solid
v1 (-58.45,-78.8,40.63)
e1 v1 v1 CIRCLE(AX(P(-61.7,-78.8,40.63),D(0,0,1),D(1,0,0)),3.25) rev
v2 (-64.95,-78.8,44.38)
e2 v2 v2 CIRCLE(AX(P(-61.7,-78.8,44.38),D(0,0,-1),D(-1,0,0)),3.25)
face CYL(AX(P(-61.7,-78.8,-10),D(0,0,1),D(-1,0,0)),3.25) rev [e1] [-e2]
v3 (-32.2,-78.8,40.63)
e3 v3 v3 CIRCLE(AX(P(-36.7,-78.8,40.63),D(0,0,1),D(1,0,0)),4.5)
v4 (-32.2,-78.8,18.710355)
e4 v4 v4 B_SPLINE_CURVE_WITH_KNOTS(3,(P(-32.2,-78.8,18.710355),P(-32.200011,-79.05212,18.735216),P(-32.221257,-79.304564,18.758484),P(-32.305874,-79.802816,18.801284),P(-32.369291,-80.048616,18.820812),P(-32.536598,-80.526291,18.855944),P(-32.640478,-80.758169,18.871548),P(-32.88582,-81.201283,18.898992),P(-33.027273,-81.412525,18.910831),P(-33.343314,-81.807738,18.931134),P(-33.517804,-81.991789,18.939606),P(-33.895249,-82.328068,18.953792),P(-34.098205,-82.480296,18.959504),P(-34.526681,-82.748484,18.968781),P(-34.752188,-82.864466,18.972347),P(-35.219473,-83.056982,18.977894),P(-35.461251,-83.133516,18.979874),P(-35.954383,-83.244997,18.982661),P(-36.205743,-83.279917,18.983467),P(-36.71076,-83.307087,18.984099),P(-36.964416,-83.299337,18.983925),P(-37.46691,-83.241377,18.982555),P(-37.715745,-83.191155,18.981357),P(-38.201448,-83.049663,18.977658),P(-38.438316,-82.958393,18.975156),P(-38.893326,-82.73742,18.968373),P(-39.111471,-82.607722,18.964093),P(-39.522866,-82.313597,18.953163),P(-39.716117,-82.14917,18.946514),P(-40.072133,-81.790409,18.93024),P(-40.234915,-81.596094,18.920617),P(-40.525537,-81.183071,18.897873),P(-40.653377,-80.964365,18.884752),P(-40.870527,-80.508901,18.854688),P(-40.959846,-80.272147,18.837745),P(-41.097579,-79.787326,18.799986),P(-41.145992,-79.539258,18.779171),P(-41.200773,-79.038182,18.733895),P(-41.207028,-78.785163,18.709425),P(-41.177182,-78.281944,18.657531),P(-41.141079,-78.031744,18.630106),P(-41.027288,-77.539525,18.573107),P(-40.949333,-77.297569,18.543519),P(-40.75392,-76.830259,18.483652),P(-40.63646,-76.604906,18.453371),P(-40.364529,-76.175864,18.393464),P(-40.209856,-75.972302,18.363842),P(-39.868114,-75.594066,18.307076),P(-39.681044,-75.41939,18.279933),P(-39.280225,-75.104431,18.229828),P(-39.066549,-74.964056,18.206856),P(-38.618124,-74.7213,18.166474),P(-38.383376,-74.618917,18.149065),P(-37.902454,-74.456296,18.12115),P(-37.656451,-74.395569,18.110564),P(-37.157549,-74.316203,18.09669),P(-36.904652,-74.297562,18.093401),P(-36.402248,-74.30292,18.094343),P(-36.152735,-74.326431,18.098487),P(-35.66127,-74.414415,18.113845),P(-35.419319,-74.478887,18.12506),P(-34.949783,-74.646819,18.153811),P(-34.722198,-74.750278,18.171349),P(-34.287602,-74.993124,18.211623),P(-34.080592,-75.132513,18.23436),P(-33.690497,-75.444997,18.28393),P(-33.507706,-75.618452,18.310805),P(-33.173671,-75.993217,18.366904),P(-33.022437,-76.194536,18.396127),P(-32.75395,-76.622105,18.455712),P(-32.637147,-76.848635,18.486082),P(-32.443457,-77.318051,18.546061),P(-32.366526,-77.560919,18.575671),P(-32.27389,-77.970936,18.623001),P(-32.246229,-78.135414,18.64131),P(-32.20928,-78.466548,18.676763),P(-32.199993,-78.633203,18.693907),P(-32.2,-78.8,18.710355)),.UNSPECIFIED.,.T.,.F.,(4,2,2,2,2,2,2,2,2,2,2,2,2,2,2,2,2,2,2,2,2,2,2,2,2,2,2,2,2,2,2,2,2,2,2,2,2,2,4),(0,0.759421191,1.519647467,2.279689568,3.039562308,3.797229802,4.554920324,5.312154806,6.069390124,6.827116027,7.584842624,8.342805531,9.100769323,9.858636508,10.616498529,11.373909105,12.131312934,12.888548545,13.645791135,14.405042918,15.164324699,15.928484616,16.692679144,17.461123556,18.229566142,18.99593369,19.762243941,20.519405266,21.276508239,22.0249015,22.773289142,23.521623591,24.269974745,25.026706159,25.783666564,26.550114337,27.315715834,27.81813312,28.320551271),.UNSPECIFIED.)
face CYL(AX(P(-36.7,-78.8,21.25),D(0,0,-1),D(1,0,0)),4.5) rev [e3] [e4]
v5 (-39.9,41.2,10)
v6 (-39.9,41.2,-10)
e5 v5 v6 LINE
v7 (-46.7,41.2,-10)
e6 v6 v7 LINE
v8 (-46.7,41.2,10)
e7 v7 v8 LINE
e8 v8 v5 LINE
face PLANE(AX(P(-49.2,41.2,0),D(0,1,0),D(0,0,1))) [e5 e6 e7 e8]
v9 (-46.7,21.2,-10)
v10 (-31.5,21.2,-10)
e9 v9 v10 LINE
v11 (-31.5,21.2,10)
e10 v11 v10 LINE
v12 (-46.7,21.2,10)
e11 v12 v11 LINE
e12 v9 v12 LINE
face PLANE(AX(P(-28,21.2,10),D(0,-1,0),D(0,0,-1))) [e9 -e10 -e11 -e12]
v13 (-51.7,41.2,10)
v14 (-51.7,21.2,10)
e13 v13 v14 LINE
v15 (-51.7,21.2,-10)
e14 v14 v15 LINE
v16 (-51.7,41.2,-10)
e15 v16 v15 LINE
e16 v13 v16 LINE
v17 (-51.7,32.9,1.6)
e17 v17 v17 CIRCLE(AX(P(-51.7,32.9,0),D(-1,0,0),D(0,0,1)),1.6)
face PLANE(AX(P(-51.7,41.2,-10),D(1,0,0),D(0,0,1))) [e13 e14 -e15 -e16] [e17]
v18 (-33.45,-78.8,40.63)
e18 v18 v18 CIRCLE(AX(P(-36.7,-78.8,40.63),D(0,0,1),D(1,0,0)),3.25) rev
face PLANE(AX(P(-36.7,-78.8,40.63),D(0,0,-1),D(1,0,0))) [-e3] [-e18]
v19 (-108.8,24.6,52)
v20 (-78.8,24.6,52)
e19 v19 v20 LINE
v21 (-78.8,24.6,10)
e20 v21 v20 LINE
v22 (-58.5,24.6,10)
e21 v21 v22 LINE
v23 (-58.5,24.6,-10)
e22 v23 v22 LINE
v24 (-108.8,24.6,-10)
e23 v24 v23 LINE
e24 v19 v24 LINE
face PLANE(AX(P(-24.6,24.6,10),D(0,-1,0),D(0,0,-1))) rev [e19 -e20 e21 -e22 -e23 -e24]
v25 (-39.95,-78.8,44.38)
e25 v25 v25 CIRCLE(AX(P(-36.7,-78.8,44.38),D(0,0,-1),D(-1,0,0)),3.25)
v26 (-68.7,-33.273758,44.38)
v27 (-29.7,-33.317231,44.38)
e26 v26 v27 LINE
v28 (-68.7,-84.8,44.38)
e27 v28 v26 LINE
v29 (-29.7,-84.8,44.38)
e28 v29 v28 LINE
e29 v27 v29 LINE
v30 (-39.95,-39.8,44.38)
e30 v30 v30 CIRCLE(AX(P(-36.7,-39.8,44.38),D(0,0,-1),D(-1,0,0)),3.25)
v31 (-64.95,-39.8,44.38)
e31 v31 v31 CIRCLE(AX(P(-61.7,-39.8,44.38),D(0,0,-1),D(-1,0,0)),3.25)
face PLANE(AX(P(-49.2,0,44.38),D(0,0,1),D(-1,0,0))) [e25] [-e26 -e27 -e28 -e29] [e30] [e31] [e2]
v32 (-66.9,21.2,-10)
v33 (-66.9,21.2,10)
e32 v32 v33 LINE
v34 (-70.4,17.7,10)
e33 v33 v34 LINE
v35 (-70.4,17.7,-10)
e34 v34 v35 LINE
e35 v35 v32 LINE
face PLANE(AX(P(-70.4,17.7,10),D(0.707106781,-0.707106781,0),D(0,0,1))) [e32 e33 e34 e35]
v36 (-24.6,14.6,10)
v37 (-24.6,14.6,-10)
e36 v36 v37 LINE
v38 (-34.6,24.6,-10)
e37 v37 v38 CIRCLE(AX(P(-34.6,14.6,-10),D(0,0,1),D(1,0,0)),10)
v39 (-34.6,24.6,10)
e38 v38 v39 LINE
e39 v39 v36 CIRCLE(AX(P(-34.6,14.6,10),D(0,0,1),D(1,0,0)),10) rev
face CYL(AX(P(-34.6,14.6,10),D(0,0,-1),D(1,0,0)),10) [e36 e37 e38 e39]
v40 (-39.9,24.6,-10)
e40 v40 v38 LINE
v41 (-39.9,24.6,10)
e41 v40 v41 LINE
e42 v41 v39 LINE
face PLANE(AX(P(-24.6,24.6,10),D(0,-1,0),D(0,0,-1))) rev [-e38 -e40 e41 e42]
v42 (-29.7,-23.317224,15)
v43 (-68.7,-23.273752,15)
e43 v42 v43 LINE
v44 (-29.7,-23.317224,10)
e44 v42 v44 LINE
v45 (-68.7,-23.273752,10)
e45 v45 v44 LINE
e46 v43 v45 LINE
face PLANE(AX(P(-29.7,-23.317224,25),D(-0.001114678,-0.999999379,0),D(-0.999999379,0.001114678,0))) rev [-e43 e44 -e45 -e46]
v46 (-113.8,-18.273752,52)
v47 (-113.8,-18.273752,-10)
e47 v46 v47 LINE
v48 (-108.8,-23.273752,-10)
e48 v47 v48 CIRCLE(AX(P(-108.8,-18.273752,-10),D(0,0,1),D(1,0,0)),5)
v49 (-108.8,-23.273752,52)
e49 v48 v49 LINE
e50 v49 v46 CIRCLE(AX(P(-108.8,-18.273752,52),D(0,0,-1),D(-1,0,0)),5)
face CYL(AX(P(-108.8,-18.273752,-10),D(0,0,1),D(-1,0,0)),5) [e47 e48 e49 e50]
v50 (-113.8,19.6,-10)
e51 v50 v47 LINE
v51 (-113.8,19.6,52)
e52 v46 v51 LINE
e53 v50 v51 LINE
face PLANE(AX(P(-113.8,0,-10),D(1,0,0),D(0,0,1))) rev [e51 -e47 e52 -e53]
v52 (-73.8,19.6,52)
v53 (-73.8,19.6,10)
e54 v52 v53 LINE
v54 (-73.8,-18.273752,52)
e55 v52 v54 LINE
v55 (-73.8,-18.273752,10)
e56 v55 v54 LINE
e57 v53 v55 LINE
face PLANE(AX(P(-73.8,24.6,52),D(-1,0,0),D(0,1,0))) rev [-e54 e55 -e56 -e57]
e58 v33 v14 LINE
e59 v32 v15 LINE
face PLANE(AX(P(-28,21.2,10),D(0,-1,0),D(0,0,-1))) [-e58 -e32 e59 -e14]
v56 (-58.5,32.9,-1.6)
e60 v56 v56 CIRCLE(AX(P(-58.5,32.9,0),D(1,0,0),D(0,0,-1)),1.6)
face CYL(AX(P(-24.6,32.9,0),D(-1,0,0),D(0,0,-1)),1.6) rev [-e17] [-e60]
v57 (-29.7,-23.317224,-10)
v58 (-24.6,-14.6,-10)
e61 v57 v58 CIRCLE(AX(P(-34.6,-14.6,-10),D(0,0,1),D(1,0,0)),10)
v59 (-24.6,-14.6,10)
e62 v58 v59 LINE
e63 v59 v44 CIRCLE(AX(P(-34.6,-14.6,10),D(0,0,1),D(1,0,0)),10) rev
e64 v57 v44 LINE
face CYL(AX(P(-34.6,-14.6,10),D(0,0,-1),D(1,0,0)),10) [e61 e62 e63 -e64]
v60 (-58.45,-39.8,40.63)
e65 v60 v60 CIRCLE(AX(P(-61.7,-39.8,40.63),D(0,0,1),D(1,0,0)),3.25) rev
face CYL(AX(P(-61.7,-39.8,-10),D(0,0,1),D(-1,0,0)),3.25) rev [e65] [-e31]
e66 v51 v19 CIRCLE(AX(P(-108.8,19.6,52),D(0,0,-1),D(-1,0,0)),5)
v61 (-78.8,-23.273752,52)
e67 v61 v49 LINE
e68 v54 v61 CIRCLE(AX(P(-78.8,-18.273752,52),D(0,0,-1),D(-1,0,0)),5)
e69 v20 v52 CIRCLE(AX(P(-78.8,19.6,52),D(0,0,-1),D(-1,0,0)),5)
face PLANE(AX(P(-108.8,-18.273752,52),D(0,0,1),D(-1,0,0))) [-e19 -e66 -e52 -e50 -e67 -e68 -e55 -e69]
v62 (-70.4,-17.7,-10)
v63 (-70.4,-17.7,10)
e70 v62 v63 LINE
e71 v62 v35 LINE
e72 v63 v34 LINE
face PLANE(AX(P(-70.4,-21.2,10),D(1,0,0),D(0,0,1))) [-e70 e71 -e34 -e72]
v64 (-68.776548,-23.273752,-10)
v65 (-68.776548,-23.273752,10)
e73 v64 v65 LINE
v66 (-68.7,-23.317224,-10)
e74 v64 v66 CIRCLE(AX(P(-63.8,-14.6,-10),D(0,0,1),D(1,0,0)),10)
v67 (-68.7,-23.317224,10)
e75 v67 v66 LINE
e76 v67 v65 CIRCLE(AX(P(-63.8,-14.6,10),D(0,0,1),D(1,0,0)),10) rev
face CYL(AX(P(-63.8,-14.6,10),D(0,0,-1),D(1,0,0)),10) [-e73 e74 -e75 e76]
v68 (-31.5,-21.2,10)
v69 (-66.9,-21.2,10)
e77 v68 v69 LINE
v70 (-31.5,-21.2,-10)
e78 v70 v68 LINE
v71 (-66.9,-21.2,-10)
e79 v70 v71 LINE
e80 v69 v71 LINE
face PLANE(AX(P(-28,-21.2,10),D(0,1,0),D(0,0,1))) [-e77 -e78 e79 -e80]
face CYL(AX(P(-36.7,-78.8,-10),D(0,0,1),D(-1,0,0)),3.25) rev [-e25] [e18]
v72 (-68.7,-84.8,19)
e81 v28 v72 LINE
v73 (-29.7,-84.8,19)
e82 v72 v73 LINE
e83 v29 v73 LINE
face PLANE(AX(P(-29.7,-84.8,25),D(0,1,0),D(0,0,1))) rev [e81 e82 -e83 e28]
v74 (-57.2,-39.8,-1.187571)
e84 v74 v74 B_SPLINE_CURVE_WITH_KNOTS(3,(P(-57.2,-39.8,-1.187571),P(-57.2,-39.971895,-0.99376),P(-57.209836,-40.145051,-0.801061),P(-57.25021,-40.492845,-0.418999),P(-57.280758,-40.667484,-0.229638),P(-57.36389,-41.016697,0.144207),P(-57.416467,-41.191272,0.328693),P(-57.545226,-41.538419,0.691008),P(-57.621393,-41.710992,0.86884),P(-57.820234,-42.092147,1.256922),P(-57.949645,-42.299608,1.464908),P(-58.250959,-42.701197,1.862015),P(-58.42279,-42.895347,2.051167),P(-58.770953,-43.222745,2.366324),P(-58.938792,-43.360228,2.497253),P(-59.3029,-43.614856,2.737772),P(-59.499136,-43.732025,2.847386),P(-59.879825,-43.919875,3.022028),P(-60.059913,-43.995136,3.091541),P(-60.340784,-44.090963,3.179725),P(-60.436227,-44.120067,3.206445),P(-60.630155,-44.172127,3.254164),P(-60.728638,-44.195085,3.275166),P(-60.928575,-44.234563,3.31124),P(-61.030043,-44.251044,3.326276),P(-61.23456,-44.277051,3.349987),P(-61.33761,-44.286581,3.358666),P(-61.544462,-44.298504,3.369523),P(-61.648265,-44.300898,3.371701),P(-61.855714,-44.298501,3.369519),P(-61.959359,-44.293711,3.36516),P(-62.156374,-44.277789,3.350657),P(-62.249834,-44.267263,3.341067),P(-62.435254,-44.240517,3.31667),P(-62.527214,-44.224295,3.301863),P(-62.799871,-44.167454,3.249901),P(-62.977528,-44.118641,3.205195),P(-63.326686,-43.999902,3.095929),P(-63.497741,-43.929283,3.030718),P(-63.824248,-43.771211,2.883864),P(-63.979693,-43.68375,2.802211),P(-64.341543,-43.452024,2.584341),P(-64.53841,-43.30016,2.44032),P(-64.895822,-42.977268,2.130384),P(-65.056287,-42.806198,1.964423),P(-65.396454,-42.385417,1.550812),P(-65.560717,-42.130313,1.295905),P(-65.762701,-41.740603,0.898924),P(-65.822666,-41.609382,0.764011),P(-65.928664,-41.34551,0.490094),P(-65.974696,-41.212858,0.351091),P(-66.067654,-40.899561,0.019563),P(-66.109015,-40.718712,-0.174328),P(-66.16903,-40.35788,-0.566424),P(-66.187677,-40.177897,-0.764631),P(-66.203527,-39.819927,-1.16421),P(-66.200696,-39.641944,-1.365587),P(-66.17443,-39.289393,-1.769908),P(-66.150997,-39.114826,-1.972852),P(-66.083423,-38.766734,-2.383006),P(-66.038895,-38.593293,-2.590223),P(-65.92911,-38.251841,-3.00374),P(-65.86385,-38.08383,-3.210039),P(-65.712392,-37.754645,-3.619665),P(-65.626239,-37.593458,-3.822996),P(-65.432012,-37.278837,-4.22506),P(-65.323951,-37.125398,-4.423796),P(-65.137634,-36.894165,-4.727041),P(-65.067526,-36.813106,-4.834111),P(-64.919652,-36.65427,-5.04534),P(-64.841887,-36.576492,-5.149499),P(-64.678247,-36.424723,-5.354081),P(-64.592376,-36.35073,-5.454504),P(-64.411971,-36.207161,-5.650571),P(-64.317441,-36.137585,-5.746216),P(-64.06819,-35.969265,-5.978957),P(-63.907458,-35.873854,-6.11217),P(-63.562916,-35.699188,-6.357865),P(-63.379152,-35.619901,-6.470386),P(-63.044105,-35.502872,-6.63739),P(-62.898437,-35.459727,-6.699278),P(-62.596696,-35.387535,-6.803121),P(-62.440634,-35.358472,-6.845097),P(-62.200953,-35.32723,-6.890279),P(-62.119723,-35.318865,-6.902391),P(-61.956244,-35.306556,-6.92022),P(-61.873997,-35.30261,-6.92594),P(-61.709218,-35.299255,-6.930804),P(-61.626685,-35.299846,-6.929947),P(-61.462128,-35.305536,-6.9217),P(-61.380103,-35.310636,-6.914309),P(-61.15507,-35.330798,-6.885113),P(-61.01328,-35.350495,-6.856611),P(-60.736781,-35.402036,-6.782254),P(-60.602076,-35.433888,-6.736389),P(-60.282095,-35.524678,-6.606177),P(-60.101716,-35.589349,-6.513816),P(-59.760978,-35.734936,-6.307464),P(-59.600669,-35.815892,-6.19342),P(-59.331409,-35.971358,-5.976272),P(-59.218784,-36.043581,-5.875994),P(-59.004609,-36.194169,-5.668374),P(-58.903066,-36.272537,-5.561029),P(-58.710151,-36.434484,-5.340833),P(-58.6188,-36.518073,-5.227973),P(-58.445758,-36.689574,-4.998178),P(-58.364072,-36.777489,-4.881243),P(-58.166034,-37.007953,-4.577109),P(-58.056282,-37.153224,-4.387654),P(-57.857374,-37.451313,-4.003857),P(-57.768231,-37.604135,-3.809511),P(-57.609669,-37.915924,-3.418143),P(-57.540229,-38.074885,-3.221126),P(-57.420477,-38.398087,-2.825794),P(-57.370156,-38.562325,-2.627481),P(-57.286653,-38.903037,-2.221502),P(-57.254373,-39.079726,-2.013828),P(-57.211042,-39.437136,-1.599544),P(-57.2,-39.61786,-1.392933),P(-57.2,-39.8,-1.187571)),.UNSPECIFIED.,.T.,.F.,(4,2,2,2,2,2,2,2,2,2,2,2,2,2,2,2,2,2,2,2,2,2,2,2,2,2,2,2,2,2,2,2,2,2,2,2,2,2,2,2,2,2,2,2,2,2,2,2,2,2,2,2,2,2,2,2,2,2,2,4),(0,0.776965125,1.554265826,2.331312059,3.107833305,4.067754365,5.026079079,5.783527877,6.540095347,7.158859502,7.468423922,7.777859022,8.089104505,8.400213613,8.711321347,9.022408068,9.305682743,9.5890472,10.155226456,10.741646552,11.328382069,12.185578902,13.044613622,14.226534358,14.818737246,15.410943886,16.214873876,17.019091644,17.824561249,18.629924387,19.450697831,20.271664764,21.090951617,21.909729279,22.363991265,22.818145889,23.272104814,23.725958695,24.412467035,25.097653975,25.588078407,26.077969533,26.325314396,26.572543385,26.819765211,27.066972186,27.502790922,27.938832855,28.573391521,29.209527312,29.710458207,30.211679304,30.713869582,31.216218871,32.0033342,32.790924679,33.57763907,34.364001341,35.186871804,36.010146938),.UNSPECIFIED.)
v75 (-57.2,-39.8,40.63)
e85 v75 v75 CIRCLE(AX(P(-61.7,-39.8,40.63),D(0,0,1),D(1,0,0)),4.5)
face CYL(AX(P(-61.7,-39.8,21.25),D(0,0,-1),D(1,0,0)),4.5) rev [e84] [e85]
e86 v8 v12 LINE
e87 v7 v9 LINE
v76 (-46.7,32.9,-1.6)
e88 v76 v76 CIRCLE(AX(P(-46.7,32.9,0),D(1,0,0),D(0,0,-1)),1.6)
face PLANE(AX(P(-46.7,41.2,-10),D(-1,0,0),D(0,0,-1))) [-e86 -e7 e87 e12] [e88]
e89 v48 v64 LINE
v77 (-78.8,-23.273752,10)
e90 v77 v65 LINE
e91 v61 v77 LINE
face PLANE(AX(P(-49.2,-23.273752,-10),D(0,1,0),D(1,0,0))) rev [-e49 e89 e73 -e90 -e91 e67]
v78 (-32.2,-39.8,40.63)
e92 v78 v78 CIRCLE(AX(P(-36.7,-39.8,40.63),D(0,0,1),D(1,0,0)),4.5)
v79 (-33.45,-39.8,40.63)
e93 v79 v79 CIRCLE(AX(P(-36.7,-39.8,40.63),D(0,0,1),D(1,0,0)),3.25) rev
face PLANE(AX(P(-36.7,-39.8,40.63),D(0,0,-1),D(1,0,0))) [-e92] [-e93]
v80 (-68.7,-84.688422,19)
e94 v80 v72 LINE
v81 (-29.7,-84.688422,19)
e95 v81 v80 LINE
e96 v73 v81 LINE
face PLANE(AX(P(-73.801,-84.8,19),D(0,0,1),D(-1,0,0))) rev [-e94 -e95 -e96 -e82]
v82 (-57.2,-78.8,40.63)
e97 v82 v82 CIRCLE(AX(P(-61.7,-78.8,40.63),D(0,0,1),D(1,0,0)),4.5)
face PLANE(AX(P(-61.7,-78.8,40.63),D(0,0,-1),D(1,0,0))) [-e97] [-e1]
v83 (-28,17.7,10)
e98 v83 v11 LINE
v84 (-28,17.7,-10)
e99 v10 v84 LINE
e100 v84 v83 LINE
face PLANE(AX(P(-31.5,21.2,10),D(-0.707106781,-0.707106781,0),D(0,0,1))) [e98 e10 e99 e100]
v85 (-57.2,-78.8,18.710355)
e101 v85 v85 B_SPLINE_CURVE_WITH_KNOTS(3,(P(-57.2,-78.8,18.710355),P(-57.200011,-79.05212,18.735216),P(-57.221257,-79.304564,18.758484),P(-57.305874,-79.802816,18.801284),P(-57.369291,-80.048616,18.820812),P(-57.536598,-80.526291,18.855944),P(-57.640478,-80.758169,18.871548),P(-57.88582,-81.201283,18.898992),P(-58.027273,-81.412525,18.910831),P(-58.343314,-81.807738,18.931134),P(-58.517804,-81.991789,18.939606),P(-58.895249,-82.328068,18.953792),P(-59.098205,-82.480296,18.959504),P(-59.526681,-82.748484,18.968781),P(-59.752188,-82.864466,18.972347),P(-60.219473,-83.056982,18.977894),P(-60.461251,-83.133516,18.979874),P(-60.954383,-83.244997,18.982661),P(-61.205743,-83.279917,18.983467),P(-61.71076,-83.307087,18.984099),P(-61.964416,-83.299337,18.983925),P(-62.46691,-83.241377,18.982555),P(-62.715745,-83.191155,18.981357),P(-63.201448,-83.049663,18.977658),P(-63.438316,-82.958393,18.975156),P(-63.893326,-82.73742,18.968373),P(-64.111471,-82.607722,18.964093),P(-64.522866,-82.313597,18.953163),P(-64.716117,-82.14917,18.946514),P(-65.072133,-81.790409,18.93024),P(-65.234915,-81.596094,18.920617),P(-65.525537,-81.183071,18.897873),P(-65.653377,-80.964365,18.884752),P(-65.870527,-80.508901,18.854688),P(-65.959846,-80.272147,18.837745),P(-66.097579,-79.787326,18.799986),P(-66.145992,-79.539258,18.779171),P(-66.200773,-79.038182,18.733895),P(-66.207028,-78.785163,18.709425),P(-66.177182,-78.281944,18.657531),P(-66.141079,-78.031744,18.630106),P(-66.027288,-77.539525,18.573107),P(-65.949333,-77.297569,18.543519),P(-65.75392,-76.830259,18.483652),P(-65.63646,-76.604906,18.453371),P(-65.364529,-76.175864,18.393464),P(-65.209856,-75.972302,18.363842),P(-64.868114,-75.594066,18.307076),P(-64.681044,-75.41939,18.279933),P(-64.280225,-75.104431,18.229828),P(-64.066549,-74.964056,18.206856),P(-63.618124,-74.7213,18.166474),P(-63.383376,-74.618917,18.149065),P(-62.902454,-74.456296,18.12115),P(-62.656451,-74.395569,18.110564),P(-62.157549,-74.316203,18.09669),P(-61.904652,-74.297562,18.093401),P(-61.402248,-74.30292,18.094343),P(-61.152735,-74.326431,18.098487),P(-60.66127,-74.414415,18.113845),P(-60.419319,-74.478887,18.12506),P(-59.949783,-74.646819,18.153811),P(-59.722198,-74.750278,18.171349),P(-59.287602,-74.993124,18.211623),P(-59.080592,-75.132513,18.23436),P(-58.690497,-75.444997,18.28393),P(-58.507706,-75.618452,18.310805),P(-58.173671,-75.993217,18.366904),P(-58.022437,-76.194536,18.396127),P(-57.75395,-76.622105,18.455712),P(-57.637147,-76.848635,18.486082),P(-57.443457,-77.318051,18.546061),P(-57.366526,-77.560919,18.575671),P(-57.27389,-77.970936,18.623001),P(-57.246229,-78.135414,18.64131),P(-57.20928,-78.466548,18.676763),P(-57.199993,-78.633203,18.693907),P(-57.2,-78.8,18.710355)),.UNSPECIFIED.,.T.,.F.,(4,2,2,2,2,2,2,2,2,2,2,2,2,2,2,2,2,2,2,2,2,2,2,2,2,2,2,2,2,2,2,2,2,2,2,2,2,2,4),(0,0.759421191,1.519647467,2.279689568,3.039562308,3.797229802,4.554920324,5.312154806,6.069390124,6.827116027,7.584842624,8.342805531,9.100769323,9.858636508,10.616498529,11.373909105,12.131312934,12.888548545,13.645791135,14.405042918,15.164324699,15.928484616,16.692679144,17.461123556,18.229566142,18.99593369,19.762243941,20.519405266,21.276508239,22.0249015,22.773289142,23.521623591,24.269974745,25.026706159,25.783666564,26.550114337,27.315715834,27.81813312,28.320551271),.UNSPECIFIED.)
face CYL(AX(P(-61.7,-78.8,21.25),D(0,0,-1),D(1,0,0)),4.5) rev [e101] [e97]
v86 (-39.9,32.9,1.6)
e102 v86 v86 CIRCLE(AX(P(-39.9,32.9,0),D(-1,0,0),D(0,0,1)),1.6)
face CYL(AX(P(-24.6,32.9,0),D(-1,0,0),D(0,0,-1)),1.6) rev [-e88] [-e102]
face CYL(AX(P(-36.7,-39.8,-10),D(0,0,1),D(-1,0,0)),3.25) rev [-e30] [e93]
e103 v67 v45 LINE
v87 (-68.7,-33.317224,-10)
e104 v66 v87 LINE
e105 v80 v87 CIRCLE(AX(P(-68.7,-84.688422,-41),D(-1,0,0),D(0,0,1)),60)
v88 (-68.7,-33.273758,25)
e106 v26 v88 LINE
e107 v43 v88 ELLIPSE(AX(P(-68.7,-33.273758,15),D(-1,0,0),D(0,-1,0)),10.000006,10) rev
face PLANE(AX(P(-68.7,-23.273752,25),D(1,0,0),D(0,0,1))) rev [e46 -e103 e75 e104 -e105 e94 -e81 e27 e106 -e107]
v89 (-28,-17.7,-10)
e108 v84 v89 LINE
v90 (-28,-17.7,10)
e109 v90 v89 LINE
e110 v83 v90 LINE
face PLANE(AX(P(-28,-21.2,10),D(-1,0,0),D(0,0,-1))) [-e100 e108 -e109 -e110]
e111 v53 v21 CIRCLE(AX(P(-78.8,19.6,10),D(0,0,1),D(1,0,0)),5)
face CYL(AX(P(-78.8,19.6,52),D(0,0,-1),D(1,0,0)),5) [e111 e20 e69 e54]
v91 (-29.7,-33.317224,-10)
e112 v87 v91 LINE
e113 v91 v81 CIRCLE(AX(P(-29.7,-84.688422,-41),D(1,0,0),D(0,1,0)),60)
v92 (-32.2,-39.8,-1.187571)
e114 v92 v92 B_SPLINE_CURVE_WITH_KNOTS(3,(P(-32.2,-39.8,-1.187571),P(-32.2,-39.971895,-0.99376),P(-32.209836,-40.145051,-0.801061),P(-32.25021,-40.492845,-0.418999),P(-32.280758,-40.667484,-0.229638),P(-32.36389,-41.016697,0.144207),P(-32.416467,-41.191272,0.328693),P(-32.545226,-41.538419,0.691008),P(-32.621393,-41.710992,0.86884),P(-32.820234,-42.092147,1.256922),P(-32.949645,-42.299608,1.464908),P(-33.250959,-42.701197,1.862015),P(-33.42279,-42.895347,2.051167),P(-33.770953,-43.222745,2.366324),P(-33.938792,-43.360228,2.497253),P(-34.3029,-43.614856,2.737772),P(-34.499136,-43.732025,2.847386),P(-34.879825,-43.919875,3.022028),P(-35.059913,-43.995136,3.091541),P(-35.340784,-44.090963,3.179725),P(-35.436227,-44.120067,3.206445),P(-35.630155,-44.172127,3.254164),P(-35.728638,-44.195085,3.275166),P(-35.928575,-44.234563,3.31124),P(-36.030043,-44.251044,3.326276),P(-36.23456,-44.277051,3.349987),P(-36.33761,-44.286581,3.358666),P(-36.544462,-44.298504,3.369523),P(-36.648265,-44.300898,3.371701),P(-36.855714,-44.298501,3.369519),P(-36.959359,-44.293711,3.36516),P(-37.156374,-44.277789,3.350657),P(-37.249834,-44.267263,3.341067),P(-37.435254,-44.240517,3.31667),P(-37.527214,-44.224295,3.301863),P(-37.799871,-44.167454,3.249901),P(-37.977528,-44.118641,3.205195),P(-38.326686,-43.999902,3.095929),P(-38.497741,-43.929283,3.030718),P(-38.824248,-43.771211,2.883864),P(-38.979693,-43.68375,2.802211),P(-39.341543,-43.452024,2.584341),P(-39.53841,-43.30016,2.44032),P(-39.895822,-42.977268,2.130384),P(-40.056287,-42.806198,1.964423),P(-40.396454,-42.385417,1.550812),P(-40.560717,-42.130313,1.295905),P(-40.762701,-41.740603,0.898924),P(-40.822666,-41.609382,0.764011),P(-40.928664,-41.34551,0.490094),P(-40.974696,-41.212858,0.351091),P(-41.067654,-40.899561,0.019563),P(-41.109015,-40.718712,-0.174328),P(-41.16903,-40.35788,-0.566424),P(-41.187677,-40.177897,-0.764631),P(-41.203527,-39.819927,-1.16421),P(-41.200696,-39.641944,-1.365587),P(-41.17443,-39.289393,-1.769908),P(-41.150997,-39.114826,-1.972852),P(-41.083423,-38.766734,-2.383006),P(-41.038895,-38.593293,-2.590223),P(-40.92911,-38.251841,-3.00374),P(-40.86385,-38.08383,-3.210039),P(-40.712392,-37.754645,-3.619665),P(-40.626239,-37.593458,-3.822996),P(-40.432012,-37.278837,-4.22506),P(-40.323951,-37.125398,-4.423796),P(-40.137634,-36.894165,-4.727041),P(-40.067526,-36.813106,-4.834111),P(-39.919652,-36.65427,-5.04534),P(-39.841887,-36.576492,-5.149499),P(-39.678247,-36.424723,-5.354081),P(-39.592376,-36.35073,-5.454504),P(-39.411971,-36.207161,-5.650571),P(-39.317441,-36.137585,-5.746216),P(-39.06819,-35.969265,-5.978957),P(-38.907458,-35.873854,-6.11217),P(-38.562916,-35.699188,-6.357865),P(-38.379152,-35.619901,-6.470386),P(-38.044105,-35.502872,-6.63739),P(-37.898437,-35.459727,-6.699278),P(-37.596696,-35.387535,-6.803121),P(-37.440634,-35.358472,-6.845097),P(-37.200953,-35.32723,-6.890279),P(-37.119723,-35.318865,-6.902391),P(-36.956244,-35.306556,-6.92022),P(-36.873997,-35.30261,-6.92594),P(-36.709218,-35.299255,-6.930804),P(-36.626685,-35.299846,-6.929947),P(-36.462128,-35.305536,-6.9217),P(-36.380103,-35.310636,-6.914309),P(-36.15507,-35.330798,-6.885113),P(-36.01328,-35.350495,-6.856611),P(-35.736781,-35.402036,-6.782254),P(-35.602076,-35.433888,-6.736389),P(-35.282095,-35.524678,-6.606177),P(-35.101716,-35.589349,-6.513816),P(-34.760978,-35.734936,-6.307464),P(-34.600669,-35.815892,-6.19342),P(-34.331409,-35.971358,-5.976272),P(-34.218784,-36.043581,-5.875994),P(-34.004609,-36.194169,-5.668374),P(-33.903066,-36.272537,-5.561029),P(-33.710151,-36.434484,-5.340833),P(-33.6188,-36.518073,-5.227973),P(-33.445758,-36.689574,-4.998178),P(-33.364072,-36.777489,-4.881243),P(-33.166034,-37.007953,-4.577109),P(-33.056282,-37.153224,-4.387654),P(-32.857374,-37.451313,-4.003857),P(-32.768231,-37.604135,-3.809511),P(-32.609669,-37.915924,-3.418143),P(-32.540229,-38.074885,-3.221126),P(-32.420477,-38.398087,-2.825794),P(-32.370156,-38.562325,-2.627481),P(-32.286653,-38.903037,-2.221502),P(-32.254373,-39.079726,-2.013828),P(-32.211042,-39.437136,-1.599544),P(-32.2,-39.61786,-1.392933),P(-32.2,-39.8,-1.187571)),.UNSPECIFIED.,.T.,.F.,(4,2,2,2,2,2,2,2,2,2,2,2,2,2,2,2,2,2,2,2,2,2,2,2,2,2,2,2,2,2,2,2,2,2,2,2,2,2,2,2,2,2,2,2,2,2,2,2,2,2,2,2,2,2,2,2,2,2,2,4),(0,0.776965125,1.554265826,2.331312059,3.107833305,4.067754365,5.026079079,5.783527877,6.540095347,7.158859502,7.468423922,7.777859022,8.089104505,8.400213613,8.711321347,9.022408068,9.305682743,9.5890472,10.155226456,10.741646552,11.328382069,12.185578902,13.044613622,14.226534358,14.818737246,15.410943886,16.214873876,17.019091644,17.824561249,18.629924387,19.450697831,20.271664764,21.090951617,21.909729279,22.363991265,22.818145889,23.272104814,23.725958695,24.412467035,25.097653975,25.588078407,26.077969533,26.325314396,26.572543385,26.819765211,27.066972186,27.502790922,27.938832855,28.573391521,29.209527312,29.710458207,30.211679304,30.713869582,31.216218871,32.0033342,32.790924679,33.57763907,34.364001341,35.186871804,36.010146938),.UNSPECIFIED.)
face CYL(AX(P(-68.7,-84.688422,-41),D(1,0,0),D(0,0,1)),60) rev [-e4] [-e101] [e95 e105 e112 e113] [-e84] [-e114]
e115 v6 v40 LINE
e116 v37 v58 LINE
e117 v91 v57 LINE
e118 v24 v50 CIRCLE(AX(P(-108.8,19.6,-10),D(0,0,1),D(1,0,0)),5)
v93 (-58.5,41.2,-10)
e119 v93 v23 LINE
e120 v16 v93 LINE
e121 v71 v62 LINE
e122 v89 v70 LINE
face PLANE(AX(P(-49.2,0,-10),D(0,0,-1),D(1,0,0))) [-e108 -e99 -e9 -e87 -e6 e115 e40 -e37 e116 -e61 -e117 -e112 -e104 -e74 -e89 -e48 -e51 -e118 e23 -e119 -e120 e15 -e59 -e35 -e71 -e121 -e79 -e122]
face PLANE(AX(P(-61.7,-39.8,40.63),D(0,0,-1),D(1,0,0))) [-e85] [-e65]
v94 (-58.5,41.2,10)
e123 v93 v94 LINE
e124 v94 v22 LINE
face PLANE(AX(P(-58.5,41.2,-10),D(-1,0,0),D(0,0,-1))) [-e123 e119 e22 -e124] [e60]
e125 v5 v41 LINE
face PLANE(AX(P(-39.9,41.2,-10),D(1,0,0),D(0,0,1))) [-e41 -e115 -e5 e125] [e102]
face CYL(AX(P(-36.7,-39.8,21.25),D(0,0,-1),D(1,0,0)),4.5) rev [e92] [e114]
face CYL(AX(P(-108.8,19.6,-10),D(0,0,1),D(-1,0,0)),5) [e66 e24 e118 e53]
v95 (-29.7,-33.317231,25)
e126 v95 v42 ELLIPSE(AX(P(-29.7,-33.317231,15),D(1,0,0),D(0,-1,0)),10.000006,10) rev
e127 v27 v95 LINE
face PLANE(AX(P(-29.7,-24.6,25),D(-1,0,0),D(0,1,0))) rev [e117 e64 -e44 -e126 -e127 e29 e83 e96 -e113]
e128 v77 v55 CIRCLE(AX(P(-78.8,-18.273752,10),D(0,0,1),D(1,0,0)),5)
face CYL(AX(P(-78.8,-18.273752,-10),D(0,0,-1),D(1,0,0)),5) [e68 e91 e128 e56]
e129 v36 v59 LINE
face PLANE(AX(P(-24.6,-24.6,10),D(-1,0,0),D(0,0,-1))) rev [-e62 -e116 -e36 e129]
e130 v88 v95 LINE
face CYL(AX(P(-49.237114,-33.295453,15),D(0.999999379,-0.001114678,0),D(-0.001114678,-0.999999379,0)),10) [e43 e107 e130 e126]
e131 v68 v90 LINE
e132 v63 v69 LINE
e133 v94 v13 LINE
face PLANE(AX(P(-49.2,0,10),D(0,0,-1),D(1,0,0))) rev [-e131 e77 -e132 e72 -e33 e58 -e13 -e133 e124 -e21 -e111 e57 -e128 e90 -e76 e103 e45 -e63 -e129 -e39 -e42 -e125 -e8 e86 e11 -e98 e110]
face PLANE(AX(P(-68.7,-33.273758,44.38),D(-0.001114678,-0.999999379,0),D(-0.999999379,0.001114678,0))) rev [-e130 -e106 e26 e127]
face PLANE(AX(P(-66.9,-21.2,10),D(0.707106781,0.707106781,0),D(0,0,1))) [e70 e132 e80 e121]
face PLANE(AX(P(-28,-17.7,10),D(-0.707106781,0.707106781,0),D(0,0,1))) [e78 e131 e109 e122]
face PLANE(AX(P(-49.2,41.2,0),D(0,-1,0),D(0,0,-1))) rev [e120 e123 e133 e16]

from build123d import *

# Parameters (mm, degrees)
SKETCH1_W           = 49.2
SKETCH1_H           = 49.2
SKETCH1_W_2         = 42.4
SKETCH1_H_2         = 42.4
BOSS_EXTRUDE1_DEPTH = 10
CHAMFER1_SIZE       = 3.5
FILLET1_R           = 10
CUT_EXTRUDE1_REACH  = 42.129
SKETCH2_W           = 18.6
SKETCH2_H           = 6.8
SKETCH4_W           = 6.8
SKETCH4_H           = 20
BOSS_EXTRUDE2_DEPTH = 20
SKETCH5_R           = 1.6
CUT_EXTRUDE2_DEPTH  = 55.283054446
BOSS_EXTRUDE3_DEPTH = 25
SKETCH8_W           = 39
SKETCH8_H           = 10
BOSS_EXTRUDE4_DEPTH = 10
FILLET3_R           = 10
CUT_EXTRUDE3_REACH  = 100.797
SKETCH10_W          = 19
SKETCH10_H          = 51.482775671
FILLET4_R           = 60
SKETCH11_R          = 3.25
CUT_EXTRUDE4_DEPTH  = 95.979997894
SKETCH15_R          = 4.5
CUT_EXTRUDE6_DEPTH  = 31.25
SKETCH16_R          = 4.5
CUT_EXTRUDE7_DEPTH  = 31.25
BOSS_EXTRUDE5_START = 19.38
SKETCH17_R          = 3.25
BOSS_EXTRUDE5_DEPTH = 19.38
SKETCH18_R          = 4.5
CUT_EXTRUDE8_DEPTH  = 19.38
BOSS_EXTRUDE6_DEPTH = 20
FILLET6_R           = 5
BOSS_EXTRUDE7_DEPTH = 42
FILLET7_R           = 5


with BuildPart() as part:
    # Sketch1 → Boss-Extrude1 (new, symmetric)
    with BuildSketch(Plane.XY):
        Rectangle(SKETCH1_W, SKETCH1_H)
        Rectangle(SKETCH1_W_2, SKETCH1_H_2, mode=Mode.SUBTRACT)
    extrude(amount=BOSS_EXTRUDE1_DEPTH, both=True)

    # Chamfer1
    chamfer1_edges = [part.edges().sort_by_distance(p)[0] for p in [
        (21.2, -21.2, 0),
        (21.2, 21.2, 0),
        (-21.2, 21.2, 0),
        (-21.2, -21.2, 0),
    ]]
    chamfer(chamfer1_edges, length=CHAMFER1_SIZE)

    # Fillet1
    fillet1_edges = [part.edges().sort_by_distance(p)[0] for p in [
        (24.6, -24.6, 0),
        (-24.6, -24.6, 0),
        (-24.6, 24.6, 0),
        (24.6, 24.6, 0),
    ]]
    fillet(fillet1_edges, radius=FILLET1_R)

    # Sketch2 → Cut-Extrude1 (cut, up to next)
    with BuildSketch(Plane.XY.offset(10), mode=Mode.PRIVATE) as cut_extrude1_sk1:
        with Locations((0, 21.2)):
            Rectangle(SKETCH2_W, SKETCH2_H)
    cut_extrude1_tool1 = extrude(cut_extrude1_sk1.sketch, amount=-CUT_EXTRUDE1_REACH, mode=Mode.PRIVATE) & part.part
    add(cut_extrude1_tool1.solids().sort_by_distance((0, 21.2, 10))[0], mode=Mode.SUBTRACT)

    # Sketch4 → Boss-Extrude2 (add)
    with BuildSketch(Plane.XZ.offset(-21.2)):
        with Locations((-5.9, 0)):
            Rectangle(SKETCH4_W, SKETCH4_H)
        with Locations((5.9, 0)):
            Rectangle(SKETCH4_W, SKETCH4_H)
    extrude(amount=-BOSS_EXTRUDE2_DEPTH)

    # Sketch5 → Cut-Extrude2 (cut, through all)
    with BuildSketch(Plane(origin=(9.3, 0, 0), x_dir=(0, 0, -1), z_dir=(1, 0, 0))):
        with Locations((0, 32.9)):
            Circle(SKETCH5_R)
    extrude(amount=-CUT_EXTRUDE2_DEPTH, mode=Mode.SUBTRACT)

    # Sketch7 → Boss-Extrude3 (add)
    with BuildSketch(Plane.XY):
        Polygon((-19.5, -24.6), (-19.5, -84.8), (19.5, -84.8), (19.5, -24.6), (19.5, -23.273751878), (-19.5, -23.317224329), align=None)
    extrude(amount=BOSS_EXTRUDE3_DEPTH)

    # Sketch8 → Boss-Extrude4 (add)
    with BuildSketch(Plane(origin=(0, 0, 0), x_dir=(-1, 0, 0), z_dir=(0, 0, -1))):
        with Locations((0, -28.317224329)):
            Rectangle(SKETCH8_W, SKETCH8_H)
    extrude(amount=BOSS_EXTRUDE4_DEPTH)

    # Fillet3
    fillet3_edges = [part.edges().sort_by_distance(p)[0] for p in [
        (0, -23.295488103, 25),
    ]]
    fillet(fillet3_edges, radius=FILLET3_R)

    # Sketch10 → Cut-Extrude3 (cut, up to next)
    with BuildSketch(Plane.ZY.offset(19.5), mode=Mode.PRIVATE) as cut_extrude3_sk1:
        with Locations((9.5, -59.058612165)):
            Rectangle(SKETCH10_W, SKETCH10_H)
    cut_extrude3_tool1 = extrude(cut_extrude3_sk1.sketch, amount=-CUT_EXTRUDE3_REACH, mode=Mode.PRIVATE) & part.part
    add(cut_extrude3_tool1.solids().sort_by_distance((-19.5, -59.058612, 9.5))[0], mode=Mode.SUBTRACT)

    # Fillet4
    # the kernel refuses this fillet: 60 mm, written as the material it adds along each edge
    with BuildSketch(Plane(origin=(-19.5, -33.317224329, 19), x_dir=(0, -1, 0), z_dir=(1, 0, 0))) as fillet4_piece_1:
        with BuildLine():
            CenterArc((51.371198156, 60), FILLET4_R, 211.108922511, 58.891077489)
            Line((0, 29), (0, 0))
            Line((0, 0), (51.371198156, 0))
        make_face()
    extrude(amount=39)

    # Sketch11 → Cut-Extrude4 (cut, through all)
    with BuildSketch(Plane.XY.offset(25)):
        with Locations((-12.5, -39.8)):
            Circle(SKETCH11_R)
        with Locations((12.5, -39.8)):
            Circle(SKETCH11_R)
        with Locations((-12.5, -78.8)):
            Circle(SKETCH11_R)
        with Locations((12.5, -78.8)):
            Circle(SKETCH11_R)
    extrude(amount=-CUT_EXTRUDE4_DEPTH, mode=Mode.SUBTRACT)

    # Sketch15 → Cut-Extrude6 (cut)
    with BuildSketch(Plane(origin=(0, 0, -10), x_dir=(-1, 0, 0), z_dir=(0, 0, -1))):
        with Locations((-12.5, -39.8)):
            Circle(SKETCH15_R)
        with Locations((12.5, -39.8)):
            Circle(SKETCH15_R)
    extrude(amount=-CUT_EXTRUDE6_DEPTH, mode=Mode.SUBTRACT)

    # Sketch16 → Cut-Extrude7 (cut)
    with BuildSketch(Plane(origin=(0, 0, -10), x_dir=(-1, 0, 0), z_dir=(0, 0, -1))):
        with Locations((-12.5, -78.8)):
            Circle(SKETCH16_R)
        with Locations((12.5, -78.8)):
            Circle(SKETCH16_R)
    extrude(amount=-CUT_EXTRUDE7_DEPTH, mode=Mode.SUBTRACT)

    # Sketch17 → Boss-Extrude5 (add)
    with BuildSketch(Plane.XY.offset(25).offset(BOSS_EXTRUDE5_START)):
        Polygon((19.5, -84.8), (19.5, -33.27375809), (-19.5, -33.317230541), (-19.5, -84.8), align=None)
        with Locations((-12.5, -78.8)):
            Circle(SKETCH17_R, mode=Mode.SUBTRACT)
        with Locations((12.5, -78.8)):
            Circle(SKETCH17_R, mode=Mode.SUBTRACT)
        with Locations((12.5, -39.8)):
            Circle(SKETCH17_R, mode=Mode.SUBTRACT)
        with Locations((-12.5, -39.8)):
            Circle(SKETCH17_R, mode=Mode.SUBTRACT)
    extrude(amount=-BOSS_EXTRUDE5_DEPTH)

    # Sketch18 → Cut-Extrude8 (cut)
    with BuildSketch(Plane(origin=(0, 0, 21.25), x_dir=(-1, 0, 0), z_dir=(0, 0, -1))):
        with Locations((12.5, -78.8)):
            Circle(SKETCH18_R)
        with Locations((-12.5, -78.8)):
            Circle(SKETCH18_R)
        with Locations((12.5, -39.8)):
            Circle(SKETCH18_R)
        with Locations((-12.5, -39.8)):
            Circle(SKETCH18_R)
    extrude(amount=-CUT_EXTRUDE8_DEPTH, mode=Mode.SUBTRACT)

    # Sketch20 → Boss-Extrude6 (add)
    with BuildSketch(Plane.XY.offset(10)):
        with BuildLine():
            Line((64.6, 24.6), (14.6, 24.6))
            ThreePointArc((14.6, 24.6), (21.671067812, 21.671067812), (24.6, 14.6))
            Line((24.6, 14.6), (24.6, -14.6))
            ThreePointArc((24.6, -14.6), (23.253481333, -19.611712364), (19.576547836, -23.273751878))
            Line((19.576547836, -23.273751878), (64.6, -23.273751878))
            Line((64.6, -23.273751878), (64.6, 24.6))
        make_face()
    extrude(amount=-BOSS_EXTRUDE6_DEPTH)

    # Fillet6
    fillet6_edges = [part.edges().sort_by_distance(p)[0] for p in [
        (64.6, -23.273751878, 0),
        (64.6, 24.6, 0),
    ]]
    fillet(fillet6_edges, radius=FILLET6_R)

    # Sketch21 → Boss-Extrude7 (add)
    with BuildSketch(Plane.XY.offset(10)):
        with BuildLine():
            Line((24.6, 24.6), (24.6, -23.273751878))
            Line((24.6, -23.273751878), (59.6, -23.273751878))
            ThreePointArc((59.6, -23.273751878), (63.135533906, -21.809285784), (64.6, -18.273751878))
            Line((64.6, -18.273751878), (64.6, 19.6))
            ThreePointArc((64.6, 19.6), (63.135533906, 23.135533906), (59.6, 24.6))
            Line((59.6, 24.6), (24.6, 24.6))
        make_face()
    extrude(amount=BOSS_EXTRUDE7_DEPTH)

    # Fillet7
    fillet7_edges = [part.edges().sort_by_distance(p)[0] for p in [
        (24.6, 24.6, 31),
        (24.6, -23.273751878, 31),
    ]]
    fillet(fillet7_edges, radius=FILLET7_R)


with BuildPart() as body_2:
    # Mirror1: mirrored copy
    add(part.part.mirror(Plane(origin=(-24.6, -24.6, 10), x_dir=(0, 0, 1), z_dir=(1, 0, 0))))


solid = body_2.part
